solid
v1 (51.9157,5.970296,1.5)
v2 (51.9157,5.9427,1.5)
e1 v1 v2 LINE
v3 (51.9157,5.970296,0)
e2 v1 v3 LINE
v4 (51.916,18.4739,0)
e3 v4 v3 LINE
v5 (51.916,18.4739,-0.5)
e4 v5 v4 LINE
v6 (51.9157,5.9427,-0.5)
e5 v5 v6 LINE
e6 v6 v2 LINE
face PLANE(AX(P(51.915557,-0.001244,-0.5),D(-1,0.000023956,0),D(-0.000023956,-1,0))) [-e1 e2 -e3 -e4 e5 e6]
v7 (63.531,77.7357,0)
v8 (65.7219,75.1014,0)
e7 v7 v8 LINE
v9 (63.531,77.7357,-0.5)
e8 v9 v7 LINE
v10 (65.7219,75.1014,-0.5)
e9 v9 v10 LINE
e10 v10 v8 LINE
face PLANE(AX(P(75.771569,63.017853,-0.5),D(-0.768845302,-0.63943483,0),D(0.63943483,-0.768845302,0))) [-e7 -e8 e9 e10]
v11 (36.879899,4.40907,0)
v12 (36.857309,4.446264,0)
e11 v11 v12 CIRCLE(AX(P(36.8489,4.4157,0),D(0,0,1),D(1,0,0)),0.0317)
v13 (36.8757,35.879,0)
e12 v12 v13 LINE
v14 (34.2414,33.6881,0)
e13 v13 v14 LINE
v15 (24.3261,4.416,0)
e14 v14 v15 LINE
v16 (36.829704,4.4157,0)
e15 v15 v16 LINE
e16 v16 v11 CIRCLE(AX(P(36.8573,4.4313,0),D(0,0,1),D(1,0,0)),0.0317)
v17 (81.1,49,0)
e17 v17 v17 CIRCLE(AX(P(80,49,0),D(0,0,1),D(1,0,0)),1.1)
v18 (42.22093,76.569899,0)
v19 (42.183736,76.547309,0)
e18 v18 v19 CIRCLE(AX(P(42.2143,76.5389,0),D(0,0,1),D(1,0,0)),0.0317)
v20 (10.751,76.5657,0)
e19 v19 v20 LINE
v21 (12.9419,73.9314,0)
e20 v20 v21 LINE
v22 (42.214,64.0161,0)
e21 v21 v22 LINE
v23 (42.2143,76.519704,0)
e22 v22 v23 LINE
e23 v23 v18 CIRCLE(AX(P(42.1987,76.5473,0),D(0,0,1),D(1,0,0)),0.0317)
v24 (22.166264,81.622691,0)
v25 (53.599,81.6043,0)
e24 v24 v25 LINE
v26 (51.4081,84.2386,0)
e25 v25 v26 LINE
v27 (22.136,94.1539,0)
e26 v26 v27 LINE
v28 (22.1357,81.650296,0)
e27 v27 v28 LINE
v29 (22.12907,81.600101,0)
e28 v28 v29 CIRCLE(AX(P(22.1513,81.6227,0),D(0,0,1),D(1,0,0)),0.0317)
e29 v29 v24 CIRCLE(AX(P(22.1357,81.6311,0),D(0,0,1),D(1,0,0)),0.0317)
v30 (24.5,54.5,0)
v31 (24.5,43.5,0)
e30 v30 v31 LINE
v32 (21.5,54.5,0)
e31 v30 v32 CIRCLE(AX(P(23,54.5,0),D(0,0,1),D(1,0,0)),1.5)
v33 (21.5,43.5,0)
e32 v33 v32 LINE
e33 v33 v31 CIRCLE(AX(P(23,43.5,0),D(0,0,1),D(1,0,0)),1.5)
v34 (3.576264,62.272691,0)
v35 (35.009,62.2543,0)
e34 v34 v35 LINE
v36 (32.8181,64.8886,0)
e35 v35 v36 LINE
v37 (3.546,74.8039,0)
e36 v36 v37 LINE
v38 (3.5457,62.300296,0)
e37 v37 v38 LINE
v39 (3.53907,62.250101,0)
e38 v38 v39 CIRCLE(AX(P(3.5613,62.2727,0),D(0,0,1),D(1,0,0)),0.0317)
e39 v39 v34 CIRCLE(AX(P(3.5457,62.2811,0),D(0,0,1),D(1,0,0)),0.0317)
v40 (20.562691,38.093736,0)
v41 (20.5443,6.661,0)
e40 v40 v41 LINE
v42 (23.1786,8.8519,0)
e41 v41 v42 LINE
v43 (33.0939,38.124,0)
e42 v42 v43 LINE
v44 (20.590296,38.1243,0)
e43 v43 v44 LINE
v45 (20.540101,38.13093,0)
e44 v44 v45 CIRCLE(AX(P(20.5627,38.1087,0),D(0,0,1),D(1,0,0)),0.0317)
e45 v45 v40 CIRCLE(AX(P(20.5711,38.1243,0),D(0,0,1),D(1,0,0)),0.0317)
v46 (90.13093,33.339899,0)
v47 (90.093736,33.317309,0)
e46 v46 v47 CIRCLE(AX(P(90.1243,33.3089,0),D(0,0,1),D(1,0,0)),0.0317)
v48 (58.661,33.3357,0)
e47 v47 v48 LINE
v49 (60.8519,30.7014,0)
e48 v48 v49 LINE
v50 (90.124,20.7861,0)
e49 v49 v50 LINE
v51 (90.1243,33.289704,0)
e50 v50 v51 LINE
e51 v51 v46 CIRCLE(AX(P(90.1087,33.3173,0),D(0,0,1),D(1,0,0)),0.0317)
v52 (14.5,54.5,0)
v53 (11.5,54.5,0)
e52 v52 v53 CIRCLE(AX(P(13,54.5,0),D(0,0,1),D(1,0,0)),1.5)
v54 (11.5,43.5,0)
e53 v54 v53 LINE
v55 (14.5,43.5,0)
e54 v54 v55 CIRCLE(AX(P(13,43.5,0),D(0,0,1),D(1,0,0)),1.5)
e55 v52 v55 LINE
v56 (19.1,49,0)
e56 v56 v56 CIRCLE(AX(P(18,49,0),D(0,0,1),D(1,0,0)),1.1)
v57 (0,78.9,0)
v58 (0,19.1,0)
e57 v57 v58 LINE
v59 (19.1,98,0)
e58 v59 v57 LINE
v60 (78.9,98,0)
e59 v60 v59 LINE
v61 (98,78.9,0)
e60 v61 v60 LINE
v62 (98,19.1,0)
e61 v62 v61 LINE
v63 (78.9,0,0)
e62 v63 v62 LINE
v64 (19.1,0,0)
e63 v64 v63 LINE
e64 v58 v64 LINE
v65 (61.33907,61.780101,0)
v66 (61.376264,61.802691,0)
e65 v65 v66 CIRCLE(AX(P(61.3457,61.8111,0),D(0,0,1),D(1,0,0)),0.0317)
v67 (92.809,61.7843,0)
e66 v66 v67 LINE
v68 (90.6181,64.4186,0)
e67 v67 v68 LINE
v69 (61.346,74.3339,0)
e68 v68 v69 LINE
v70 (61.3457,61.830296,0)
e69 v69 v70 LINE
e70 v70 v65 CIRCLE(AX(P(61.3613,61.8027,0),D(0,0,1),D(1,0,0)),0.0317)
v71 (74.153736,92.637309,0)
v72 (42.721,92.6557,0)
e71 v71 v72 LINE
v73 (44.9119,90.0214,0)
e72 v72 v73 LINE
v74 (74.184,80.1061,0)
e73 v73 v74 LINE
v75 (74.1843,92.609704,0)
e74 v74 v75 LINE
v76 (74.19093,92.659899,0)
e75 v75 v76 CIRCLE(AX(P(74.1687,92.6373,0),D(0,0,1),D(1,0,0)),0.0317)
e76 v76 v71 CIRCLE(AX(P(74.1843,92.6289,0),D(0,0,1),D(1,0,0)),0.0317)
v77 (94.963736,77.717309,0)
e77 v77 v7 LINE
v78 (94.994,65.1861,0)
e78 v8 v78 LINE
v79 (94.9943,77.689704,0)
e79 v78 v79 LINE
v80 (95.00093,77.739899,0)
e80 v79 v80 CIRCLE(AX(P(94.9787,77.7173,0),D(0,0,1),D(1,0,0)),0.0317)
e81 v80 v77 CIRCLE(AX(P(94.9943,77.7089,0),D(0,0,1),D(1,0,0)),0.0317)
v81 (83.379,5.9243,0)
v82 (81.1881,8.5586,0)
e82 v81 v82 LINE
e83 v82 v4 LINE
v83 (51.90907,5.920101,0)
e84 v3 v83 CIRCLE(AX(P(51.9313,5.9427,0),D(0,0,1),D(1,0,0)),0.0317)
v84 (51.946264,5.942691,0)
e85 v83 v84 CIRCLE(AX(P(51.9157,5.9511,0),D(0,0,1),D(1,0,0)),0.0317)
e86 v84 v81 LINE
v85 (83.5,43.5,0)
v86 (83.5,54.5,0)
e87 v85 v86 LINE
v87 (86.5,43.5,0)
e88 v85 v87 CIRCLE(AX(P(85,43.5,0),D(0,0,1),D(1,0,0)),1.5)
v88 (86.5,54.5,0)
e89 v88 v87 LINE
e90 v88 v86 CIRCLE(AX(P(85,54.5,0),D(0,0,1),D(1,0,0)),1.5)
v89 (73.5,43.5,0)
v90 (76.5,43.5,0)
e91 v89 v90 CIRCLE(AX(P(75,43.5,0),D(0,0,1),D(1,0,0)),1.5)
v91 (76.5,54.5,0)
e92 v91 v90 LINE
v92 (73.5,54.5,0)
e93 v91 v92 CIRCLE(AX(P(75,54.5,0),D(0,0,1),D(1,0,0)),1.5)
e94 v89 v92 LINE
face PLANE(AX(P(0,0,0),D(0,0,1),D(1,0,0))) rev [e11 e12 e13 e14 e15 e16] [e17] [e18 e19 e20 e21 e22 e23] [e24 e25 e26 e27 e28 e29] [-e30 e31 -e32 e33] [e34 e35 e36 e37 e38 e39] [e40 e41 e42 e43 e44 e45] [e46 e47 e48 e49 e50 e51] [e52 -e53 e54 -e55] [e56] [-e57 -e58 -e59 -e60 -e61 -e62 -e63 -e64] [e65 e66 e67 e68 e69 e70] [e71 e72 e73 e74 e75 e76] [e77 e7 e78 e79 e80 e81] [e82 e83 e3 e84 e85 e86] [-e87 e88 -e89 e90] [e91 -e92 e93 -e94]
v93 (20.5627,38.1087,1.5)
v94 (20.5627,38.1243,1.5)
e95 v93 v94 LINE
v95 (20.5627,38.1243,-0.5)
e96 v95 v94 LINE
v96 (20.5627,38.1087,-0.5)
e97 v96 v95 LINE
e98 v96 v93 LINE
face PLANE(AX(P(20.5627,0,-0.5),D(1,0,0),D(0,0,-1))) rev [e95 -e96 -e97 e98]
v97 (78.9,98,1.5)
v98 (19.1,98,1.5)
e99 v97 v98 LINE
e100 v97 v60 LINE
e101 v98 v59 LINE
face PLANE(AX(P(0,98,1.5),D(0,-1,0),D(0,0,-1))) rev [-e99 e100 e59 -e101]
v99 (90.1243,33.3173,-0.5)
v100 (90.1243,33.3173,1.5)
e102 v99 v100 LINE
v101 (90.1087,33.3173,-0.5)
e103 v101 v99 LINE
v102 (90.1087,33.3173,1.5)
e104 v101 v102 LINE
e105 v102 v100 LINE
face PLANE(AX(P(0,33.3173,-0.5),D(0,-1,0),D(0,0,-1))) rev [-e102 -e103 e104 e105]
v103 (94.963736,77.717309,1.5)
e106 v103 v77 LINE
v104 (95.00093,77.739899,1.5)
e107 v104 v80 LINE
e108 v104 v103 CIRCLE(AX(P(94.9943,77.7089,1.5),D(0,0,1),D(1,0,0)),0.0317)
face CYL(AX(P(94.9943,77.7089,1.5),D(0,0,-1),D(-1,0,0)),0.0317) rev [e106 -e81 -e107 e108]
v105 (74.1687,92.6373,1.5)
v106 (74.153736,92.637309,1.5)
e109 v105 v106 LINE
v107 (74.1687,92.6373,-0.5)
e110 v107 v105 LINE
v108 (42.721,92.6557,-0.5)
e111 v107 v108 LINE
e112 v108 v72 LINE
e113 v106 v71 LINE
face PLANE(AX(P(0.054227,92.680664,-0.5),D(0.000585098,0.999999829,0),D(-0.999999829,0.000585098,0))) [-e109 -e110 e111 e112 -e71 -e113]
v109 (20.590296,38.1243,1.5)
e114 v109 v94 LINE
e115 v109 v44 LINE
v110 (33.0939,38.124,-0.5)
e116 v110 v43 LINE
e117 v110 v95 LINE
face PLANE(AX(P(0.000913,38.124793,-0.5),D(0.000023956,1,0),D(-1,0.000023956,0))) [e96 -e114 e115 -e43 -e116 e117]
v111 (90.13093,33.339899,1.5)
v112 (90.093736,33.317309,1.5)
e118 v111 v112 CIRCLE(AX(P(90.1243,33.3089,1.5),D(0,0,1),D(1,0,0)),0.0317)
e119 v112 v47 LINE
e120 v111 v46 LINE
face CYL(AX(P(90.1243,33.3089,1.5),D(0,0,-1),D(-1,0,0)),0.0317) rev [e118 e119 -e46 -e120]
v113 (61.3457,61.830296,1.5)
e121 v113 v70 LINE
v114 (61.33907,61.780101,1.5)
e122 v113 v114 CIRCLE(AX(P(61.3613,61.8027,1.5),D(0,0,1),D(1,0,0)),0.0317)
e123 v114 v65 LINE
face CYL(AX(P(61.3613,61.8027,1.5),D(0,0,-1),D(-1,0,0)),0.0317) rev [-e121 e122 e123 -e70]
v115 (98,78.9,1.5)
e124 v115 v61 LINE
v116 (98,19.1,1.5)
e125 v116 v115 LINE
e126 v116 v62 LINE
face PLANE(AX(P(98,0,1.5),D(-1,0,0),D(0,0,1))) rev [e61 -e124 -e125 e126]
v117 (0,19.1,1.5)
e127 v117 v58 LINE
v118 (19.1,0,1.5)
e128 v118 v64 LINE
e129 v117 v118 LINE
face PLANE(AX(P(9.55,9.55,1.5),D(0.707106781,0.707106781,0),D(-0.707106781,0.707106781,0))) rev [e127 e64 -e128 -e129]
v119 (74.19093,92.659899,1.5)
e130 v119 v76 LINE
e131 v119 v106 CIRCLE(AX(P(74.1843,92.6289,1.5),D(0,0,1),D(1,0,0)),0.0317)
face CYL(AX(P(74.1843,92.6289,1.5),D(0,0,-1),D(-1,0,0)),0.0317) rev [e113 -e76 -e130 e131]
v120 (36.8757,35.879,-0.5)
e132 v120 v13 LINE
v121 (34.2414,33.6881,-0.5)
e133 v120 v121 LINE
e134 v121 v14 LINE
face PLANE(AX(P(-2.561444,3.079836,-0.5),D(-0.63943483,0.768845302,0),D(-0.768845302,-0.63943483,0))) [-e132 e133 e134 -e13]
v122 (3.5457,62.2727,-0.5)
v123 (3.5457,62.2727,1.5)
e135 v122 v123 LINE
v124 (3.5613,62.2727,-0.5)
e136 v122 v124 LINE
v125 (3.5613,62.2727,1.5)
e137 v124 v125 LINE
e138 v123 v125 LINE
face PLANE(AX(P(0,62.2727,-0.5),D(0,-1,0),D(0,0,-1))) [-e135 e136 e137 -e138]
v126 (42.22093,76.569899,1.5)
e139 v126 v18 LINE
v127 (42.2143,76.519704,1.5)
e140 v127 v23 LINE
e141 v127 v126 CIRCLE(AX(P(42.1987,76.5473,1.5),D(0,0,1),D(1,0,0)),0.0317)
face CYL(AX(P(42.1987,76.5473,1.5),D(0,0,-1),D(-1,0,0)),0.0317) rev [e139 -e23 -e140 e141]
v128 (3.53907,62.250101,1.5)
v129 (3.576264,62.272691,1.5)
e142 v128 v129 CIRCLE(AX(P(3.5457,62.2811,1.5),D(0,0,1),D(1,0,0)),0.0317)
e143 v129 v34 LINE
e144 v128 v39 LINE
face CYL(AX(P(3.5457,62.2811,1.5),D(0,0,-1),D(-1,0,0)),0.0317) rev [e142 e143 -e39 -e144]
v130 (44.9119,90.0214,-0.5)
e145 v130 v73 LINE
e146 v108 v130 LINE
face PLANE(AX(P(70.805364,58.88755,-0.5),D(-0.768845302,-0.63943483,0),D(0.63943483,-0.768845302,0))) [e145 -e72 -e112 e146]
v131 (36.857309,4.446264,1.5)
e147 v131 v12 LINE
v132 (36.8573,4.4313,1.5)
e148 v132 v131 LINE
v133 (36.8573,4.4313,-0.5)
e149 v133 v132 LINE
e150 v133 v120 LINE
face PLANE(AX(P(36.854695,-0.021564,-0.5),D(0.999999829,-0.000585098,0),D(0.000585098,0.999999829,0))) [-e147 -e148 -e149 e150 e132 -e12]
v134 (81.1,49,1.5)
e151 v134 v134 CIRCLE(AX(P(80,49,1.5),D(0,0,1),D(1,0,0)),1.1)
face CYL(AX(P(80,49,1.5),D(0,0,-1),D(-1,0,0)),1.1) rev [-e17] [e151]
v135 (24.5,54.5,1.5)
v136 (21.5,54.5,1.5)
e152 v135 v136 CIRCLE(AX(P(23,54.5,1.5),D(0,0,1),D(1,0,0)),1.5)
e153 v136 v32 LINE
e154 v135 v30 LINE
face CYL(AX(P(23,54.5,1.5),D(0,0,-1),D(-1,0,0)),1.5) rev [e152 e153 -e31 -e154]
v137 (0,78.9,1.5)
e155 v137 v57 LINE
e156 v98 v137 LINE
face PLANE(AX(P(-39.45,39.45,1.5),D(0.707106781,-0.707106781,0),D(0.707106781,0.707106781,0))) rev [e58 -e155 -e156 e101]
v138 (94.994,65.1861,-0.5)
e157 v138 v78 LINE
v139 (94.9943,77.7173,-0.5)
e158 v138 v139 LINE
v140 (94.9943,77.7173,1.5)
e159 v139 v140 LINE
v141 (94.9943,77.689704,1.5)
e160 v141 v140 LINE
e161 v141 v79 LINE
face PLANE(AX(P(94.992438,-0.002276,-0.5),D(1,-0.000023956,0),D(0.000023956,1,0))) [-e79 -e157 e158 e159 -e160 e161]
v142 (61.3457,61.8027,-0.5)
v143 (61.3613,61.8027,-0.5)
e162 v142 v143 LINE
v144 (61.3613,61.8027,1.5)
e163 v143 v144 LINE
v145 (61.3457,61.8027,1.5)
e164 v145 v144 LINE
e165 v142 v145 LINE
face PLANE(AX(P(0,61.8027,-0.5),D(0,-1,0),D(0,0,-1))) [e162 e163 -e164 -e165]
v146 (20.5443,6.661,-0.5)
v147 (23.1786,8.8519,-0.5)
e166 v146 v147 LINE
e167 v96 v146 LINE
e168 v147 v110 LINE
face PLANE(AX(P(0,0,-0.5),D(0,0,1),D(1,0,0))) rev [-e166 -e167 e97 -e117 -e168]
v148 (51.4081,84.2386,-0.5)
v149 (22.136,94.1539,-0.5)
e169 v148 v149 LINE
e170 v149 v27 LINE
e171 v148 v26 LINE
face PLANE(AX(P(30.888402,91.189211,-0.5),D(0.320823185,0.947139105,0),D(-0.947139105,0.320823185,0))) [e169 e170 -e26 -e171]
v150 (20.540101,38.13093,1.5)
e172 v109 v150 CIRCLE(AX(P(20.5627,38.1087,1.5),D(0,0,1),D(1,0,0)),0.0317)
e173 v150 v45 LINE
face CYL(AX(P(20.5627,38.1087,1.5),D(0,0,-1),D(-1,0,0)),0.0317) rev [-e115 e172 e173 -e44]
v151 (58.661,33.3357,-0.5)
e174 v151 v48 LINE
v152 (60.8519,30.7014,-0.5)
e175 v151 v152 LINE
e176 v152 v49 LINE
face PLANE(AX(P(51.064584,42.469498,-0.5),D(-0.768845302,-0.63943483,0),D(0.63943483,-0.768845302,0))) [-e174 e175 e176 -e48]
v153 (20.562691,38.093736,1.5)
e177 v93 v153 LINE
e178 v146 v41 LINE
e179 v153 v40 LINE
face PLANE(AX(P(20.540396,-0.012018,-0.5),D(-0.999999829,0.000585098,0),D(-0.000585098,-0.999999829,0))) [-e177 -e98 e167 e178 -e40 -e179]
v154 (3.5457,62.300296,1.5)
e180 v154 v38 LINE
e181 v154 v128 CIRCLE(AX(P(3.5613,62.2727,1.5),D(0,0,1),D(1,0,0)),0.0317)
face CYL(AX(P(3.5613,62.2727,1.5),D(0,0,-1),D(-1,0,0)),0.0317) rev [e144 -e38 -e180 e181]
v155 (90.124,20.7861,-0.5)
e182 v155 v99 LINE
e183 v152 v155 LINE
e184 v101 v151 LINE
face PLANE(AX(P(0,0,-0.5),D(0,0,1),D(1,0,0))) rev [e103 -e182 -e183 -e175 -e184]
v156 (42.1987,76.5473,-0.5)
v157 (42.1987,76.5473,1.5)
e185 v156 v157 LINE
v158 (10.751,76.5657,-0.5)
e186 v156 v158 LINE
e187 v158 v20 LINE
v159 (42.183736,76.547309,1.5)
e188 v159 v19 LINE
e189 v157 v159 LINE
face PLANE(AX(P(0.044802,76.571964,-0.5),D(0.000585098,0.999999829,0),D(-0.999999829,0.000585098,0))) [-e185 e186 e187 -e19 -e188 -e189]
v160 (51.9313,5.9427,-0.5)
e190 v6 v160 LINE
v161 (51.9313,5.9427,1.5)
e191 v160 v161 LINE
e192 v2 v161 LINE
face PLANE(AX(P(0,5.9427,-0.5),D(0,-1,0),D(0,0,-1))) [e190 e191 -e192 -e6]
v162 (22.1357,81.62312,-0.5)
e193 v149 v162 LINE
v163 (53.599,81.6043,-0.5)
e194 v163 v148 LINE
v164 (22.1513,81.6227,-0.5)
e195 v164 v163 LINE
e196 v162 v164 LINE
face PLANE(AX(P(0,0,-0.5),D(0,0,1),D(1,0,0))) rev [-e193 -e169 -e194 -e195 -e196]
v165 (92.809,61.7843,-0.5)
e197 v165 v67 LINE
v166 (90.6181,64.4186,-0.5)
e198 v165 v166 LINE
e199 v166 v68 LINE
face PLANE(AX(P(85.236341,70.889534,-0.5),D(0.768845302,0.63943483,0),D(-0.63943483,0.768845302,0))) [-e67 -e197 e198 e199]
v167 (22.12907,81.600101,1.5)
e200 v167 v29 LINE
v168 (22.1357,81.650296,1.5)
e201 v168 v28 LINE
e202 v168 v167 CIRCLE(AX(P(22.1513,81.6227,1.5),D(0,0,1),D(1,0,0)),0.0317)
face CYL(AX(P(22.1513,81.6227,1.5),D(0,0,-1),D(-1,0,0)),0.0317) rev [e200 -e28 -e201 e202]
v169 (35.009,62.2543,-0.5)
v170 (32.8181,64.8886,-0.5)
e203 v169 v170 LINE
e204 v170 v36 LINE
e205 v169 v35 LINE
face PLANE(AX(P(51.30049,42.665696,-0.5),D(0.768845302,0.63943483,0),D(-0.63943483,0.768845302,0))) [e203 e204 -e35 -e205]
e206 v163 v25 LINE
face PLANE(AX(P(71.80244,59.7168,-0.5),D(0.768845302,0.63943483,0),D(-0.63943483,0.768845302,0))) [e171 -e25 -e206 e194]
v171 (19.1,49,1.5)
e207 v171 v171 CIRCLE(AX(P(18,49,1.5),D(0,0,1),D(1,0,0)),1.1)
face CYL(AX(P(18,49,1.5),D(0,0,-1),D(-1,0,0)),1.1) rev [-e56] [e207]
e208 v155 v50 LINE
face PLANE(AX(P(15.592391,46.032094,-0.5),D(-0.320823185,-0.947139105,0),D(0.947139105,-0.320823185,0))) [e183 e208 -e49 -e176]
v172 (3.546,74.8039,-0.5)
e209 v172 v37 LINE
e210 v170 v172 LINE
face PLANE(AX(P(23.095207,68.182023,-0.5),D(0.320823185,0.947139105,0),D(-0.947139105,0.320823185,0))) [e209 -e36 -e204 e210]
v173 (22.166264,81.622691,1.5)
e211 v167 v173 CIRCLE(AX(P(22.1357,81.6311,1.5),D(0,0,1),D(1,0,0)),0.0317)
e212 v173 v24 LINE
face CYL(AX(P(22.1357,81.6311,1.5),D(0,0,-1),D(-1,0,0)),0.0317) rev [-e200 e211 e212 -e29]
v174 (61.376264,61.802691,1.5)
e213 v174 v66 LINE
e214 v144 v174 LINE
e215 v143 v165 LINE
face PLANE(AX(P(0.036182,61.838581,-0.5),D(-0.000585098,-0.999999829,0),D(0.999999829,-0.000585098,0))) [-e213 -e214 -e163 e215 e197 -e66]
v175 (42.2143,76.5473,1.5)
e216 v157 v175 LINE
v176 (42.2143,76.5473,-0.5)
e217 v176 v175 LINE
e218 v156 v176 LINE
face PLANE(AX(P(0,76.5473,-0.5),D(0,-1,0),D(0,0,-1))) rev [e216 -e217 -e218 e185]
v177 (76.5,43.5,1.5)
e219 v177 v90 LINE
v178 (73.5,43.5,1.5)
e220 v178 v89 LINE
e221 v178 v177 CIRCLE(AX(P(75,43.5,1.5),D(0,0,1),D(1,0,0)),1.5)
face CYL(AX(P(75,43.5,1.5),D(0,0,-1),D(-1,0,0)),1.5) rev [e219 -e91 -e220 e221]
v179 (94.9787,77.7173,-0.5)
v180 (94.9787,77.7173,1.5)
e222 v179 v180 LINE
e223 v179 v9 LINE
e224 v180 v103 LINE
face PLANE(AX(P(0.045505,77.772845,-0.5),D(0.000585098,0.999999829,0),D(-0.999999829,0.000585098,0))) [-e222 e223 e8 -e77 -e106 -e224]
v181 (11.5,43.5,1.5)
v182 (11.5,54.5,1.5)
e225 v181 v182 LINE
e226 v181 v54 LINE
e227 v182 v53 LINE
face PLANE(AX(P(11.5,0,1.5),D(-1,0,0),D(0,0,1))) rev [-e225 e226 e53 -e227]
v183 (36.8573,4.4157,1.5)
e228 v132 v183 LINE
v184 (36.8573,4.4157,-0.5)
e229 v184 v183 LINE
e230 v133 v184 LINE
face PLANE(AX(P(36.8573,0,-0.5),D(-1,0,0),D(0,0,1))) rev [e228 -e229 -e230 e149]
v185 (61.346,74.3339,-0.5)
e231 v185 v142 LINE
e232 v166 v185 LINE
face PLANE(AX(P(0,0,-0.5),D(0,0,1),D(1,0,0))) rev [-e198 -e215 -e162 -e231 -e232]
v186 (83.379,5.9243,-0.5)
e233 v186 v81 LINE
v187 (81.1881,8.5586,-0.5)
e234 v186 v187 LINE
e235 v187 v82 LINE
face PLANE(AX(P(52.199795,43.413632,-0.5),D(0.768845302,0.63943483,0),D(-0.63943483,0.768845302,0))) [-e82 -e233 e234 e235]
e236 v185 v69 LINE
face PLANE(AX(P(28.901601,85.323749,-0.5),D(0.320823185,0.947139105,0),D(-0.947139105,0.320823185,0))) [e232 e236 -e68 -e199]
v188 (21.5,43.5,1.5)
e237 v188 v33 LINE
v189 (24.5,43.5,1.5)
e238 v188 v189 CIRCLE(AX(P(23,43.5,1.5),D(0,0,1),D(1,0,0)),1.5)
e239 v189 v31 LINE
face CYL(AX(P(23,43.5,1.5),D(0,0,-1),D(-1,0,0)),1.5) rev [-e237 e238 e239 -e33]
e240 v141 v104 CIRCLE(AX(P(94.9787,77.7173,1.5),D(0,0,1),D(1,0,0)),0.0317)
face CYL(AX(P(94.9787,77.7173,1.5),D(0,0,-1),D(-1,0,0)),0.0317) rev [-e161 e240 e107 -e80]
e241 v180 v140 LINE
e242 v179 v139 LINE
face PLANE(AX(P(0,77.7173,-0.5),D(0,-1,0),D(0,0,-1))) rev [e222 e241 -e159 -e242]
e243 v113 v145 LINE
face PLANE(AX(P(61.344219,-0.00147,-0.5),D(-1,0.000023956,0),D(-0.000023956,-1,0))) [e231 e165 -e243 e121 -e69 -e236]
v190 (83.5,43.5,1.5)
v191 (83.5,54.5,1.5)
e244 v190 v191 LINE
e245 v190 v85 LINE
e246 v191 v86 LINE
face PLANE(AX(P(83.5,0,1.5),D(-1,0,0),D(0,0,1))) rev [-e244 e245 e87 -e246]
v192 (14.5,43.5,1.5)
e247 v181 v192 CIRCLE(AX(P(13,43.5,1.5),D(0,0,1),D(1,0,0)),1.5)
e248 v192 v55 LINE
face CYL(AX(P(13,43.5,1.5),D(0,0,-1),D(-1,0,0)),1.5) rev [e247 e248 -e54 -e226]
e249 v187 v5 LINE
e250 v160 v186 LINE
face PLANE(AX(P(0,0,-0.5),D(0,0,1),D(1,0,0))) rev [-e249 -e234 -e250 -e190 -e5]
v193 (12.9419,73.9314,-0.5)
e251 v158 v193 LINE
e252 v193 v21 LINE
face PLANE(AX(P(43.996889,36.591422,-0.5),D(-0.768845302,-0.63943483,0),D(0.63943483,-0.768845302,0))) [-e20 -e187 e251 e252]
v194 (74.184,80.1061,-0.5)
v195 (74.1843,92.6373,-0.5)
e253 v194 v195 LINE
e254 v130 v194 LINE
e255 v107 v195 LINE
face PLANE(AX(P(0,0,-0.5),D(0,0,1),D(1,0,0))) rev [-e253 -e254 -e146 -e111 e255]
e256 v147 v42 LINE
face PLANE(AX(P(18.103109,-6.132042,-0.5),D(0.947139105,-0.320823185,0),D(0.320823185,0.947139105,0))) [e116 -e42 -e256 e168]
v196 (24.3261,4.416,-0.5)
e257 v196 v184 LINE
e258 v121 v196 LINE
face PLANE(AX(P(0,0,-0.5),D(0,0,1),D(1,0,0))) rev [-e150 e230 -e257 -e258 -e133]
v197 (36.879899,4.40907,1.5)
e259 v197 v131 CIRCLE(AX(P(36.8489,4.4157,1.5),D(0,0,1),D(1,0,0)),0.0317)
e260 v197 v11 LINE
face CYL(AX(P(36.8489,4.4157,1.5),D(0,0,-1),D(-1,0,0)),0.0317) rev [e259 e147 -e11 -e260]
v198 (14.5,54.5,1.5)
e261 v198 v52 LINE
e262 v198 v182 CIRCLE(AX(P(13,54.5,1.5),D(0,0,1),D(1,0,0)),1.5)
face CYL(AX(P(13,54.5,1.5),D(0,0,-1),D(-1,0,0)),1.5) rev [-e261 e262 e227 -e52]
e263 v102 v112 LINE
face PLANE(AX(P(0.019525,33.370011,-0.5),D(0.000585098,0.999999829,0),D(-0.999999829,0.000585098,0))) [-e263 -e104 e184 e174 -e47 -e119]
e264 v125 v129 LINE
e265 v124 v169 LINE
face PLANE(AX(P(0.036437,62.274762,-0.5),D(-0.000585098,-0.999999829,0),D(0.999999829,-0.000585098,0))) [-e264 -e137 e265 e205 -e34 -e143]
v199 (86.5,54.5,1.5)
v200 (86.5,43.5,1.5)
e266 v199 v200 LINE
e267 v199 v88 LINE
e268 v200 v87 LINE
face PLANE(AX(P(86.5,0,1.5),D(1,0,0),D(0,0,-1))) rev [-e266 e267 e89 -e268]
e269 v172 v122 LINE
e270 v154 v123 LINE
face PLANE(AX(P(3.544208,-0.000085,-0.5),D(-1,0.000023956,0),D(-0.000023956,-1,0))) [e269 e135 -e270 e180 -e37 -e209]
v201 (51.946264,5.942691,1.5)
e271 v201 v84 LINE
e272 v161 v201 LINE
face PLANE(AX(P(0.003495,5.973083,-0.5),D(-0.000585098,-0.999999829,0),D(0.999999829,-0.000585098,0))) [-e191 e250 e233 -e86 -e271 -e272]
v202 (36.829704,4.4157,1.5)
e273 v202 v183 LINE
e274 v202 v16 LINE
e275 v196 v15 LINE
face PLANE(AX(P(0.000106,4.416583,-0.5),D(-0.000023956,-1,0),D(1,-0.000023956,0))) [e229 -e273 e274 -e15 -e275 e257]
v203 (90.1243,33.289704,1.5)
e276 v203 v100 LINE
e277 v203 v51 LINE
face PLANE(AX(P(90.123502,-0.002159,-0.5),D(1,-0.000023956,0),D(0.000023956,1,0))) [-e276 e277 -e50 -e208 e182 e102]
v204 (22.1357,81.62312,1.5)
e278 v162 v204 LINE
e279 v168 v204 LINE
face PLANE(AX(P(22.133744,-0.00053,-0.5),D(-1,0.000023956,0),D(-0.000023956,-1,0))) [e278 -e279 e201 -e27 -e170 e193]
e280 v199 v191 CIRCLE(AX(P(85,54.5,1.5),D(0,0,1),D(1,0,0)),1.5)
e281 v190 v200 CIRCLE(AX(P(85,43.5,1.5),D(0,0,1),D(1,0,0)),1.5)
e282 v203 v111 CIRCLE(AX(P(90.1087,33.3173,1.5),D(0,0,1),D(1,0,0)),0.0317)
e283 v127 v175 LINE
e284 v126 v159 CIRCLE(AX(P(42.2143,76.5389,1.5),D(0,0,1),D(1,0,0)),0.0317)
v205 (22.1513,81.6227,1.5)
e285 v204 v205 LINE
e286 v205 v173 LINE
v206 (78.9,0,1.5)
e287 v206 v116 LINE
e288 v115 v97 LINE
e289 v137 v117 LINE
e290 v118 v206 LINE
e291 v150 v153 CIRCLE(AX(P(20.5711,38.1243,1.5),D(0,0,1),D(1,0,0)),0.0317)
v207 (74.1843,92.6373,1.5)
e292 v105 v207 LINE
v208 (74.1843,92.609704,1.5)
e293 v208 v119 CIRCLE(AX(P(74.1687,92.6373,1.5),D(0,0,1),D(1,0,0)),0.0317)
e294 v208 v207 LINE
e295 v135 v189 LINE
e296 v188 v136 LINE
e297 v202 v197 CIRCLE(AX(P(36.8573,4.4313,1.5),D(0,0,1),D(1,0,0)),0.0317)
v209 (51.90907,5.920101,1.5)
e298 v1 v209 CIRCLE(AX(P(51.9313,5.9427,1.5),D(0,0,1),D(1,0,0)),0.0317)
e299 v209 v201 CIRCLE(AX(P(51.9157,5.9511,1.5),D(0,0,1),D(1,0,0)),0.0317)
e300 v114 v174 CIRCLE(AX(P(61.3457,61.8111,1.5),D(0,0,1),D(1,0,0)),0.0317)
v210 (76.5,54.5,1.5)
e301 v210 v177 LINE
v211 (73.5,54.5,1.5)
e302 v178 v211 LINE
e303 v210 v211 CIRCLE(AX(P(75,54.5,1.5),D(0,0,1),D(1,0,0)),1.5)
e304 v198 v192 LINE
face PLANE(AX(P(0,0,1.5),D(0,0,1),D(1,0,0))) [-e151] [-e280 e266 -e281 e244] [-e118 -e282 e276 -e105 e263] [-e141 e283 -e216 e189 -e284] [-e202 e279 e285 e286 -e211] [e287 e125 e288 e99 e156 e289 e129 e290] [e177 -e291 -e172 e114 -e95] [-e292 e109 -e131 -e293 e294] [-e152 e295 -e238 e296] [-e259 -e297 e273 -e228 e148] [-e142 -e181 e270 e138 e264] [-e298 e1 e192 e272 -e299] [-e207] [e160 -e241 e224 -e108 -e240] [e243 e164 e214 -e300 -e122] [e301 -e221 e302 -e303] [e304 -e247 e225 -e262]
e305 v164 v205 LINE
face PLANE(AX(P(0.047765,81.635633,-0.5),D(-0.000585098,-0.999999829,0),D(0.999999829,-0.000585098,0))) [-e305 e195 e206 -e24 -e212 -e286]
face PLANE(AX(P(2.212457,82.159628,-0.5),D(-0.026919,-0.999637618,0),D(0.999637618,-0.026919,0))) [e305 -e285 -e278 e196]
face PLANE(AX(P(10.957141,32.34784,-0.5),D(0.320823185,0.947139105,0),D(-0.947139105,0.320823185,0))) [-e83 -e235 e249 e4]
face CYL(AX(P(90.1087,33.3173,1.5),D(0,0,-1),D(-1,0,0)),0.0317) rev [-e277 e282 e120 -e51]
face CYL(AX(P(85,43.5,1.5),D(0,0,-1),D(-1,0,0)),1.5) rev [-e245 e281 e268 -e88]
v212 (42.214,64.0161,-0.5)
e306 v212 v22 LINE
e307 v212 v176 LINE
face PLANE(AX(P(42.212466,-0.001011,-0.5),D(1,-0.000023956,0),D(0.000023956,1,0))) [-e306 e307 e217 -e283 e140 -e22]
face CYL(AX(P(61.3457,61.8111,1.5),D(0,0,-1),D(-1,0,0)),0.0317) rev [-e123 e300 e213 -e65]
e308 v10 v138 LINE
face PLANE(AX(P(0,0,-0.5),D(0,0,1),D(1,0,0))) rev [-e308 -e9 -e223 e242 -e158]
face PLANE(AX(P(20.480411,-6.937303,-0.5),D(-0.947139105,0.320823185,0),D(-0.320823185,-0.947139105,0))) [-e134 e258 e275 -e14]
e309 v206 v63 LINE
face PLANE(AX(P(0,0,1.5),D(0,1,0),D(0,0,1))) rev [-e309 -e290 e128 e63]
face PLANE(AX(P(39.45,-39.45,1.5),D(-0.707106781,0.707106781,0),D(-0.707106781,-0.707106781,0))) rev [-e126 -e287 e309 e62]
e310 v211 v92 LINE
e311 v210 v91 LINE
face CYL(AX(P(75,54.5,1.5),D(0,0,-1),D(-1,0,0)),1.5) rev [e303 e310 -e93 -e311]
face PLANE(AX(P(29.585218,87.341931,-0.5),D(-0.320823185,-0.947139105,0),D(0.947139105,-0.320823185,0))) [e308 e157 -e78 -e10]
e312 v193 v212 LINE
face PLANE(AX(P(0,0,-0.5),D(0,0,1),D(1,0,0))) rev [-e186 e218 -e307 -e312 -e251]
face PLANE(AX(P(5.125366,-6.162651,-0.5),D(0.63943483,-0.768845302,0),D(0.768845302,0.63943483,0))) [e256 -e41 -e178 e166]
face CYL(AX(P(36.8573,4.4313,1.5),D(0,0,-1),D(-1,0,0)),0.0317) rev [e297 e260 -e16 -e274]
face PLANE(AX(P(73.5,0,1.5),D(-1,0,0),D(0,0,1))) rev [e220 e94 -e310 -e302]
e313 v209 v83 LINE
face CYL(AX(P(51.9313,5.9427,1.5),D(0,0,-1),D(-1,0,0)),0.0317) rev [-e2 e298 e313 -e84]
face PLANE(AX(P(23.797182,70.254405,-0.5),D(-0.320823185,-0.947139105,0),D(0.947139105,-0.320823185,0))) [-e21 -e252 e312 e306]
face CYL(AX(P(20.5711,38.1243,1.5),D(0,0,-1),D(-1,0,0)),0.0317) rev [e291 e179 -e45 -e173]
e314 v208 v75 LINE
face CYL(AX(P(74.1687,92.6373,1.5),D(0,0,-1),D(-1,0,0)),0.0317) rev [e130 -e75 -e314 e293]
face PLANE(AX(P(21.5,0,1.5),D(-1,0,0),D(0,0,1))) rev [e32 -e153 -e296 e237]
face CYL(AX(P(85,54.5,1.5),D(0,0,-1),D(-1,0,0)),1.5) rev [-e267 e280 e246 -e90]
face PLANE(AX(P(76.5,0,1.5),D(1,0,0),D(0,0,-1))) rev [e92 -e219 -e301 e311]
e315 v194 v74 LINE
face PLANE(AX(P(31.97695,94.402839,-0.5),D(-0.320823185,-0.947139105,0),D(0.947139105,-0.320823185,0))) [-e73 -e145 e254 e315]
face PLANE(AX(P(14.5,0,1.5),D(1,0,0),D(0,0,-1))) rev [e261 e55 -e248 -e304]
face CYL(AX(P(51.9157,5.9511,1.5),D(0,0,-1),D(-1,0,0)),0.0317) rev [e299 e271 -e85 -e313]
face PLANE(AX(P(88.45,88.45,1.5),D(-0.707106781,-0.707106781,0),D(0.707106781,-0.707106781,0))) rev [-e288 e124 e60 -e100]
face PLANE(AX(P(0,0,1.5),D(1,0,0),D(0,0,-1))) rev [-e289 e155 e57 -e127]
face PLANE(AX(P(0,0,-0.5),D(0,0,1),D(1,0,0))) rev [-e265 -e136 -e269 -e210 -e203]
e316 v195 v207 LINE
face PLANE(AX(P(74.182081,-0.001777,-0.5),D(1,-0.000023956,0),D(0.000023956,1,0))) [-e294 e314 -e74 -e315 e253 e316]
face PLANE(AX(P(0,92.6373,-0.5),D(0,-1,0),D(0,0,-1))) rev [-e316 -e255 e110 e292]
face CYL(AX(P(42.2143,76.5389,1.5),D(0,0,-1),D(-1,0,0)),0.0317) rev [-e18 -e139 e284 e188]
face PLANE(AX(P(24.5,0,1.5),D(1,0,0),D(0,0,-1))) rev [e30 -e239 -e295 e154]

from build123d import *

# Parameters (mm, degrees)
BOSS_EXTRUDE1_OUTLINE_R  = 1.1
BOSS_EXTRUDE1_DEPTH      = 1.5
BOSS_EXTRUDE2_DEPTH      = 1.5
BOSS_EXTRUDE2_DEPTH_BACK = 0.5


# Read off the part's stored shape, not the designer's step: Boss-Extrude1
with BuildPart() as part:
    # Boss-Extrude1 outline → Boss-Extrude1 (new body)
    with BuildSketch(Plane.XY):
        Polygon((19.1, 98), (0, 78.9), (0, 19.1), (19.1, 0), (78.9, 0), (98, 19.1), (98, 78.9), (78.9, 98), align=None)
        with BuildLine():
            Line((36.8757, 35.879), (36.857308756, 4.446264405))
            ThreePointArc((36.857308756, 4.446264405), (36.875994273, 4.43215571), (36.879898885, 4.409069831))
            ThreePointArc((36.879898885, 4.409069831), (36.853148575, 4.399873011), (36.829703907, 4.41570046))
            Line((36.829703907, 4.41570046), (24.3261, 4.416))
            Line((24.3261, 4.416), (34.2414, 33.6881))
            Line((34.2414, 33.6881), (36.8757, 35.879))
        make_face(mode=Mode.SUBTRACT)
        with BuildLine():
            Line((20.5443, 6.661), (20.562691244, 38.093735595))
            ThreePointArc((20.562691244, 38.093735595), (20.544005727, 38.10784429), (20.540101115, 38.130930169))
            ThreePointArc((20.540101115, 38.130930169), (20.566851425, 38.140126989), (20.590296093, 38.12429954))
            Line((20.590296093, 38.12429954), (33.0939, 38.124))
            Line((33.0939, 38.124), (23.1786, 8.8519))
            Line((23.1786, 8.8519), (20.5443, 6.661))
        make_face(mode=Mode.SUBTRACT)
        with BuildLine():
            Line((11.5, 43.5), (11.5, 54.5))
            ThreePointArc((11.5, 54.5), (13, 56), (14.5, 54.5))
            Line((14.5, 54.5), (14.5, 43.5))
            ThreePointArc((14.5, 43.5), (13, 42), (11.5, 43.5))
        make_face(mode=Mode.SUBTRACT)
        with Locations((18, 49)):
            Circle(BOSS_EXTRUDE1_OUTLINE_R, mode=Mode.SUBTRACT)
        with BuildLine():
            Line((21.5, 43.5), (21.5, 54.5))
            ThreePointArc((21.5, 54.5), (23, 56), (24.5, 54.5))
            Line((24.5, 54.5), (24.5, 43.5))
            ThreePointArc((24.5, 43.5), (23, 42), (21.5, 43.5))
        make_face(mode=Mode.SUBTRACT)
        with BuildLine():
            Line((83.379, 5.9243), (51.946264405, 5.942691244))
            ThreePointArc((51.946264405, 5.942691244), (51.93215571, 5.924005727), (51.909069831, 5.920101115))
            ThreePointArc((51.909069831, 5.920101115), (51.899873011, 5.946851425), (51.91570046, 5.970296093))
            Line((51.91570046, 5.970296093), (51.916, 18.4739))
            Line((51.916, 18.4739), (81.1881, 8.5586))
            Line((81.1881, 8.5586), (83.379, 5.9243))
        make_face(mode=Mode.SUBTRACT)
        with BuildLine():
            Line((58.661, 33.3357), (90.093735595, 33.317308756))
            ThreePointArc((90.093735595, 33.317308756), (90.10784429, 33.335994273), (90.130930169, 33.339898885))
            ThreePointArc((90.130930169, 33.339898885), (90.140126989, 33.313148575), (90.12429954, 33.289703907))
            Line((90.12429954, 33.289703907), (90.124, 20.7861))
            Line((90.124, 20.7861), (60.8519, 30.7014))
            Line((60.8519, 30.7014), (58.661, 33.3357))
        make_face(mode=Mode.SUBTRACT)
        with BuildLine():
            Line((73.5, 43.5), (73.5, 54.5))
            ThreePointArc((73.5, 54.5), (75, 56), (76.5, 54.5))
            Line((76.5, 54.5), (76.5, 43.5))
            ThreePointArc((76.5, 43.5), (75, 42), (73.5, 43.5))
        make_face(mode=Mode.SUBTRACT)
        with Locations((80, 49)):
            Circle(BOSS_EXTRUDE1_OUTLINE_R, mode=Mode.SUBTRACT)
        with BuildLine():
            Line((83.5, 43.5), (83.5, 54.5))
            ThreePointArc((83.5, 54.5), (85, 56), (86.5, 54.5))
            Line((86.5, 54.5), (86.5, 43.5))
            ThreePointArc((86.5, 43.5), (85, 42), (83.5, 43.5))
        make_face(mode=Mode.SUBTRACT)
        with BuildLine():
            Line((35.009, 62.2543), (3.576264405, 62.272691244))
            ThreePointArc((3.576264405, 62.272691244), (3.56215571, 62.254005727), (3.539069831, 62.250101115))
            ThreePointArc((3.539069831, 62.250101115), (3.529873011, 62.276851425), (3.54570046, 62.300296093))
            Line((3.54570046, 62.300296093), (3.546, 74.8039))
            Line((3.546, 74.8039), (32.8181, 64.8886))
            Line((32.8181, 64.8886), (35.009, 62.2543))
        make_face(mode=Mode.SUBTRACT)
        with BuildLine():
            Line((10.751, 76.5657), (42.183735595, 76.547308756))
            ThreePointArc((42.183735595, 76.547308756), (42.19784429, 76.565994273), (42.220930169, 76.569898885))
            ThreePointArc((42.220930169, 76.569898885), (42.230126989, 76.543148575), (42.21429954, 76.519703907))
            Line((42.21429954, 76.519703907), (42.214, 64.0161))
            Line((42.214, 64.0161), (12.9419, 73.9314))
            Line((12.9419, 73.9314), (10.751, 76.5657))
        make_face(mode=Mode.SUBTRACT)
        with BuildLine():
            Line((53.599, 81.6043), (22.166264405, 81.622691244))
            ThreePointArc((22.166264405, 81.622691244), (22.15215571, 81.604005727), (22.129069831, 81.600101115))
            ThreePointArc((22.129069831, 81.600101115), (22.119873011, 81.626851425), (22.13570046, 81.650296093))
            Line((22.13570046, 81.650296093), (22.136, 94.1539))
            Line((22.136, 94.1539), (51.4081, 84.2386))
            Line((51.4081, 84.2386), (53.599, 81.6043))
        make_face(mode=Mode.SUBTRACT)
        with BuildLine():
            Line((92.809, 61.7843), (61.376264405, 61.802691244))
            ThreePointArc((61.376264405, 61.802691244), (61.36215571, 61.784005727), (61.339069831, 61.780101115))
            ThreePointArc((61.339069831, 61.780101115), (61.329873011, 61.806851425), (61.34570046, 61.830296093))
            Line((61.34570046, 61.830296093), (61.346, 74.3339))
            Line((61.346, 74.3339), (90.6181, 64.4186))
            Line((90.6181, 64.4186), (92.809, 61.7843))
        make_face(mode=Mode.SUBTRACT)
        with BuildLine():
            Line((63.531, 77.7357), (94.963735595, 77.717308756))
            ThreePointArc((94.963735595, 77.717308756), (94.97784429, 77.735994273), (95.000930169, 77.739898885))
            ThreePointArc((95.000930169, 77.739898885), (95.010126989, 77.713148575), (94.99429954, 77.689703907))
            Line((94.99429954, 77.689703907), (94.994, 65.1861))
            Line((94.994, 65.1861), (65.7219, 75.1014))
            Line((65.7219, 75.1014), (63.531, 77.7357))
        make_face(mode=Mode.SUBTRACT)
        with BuildLine():
            Line((42.721, 92.6557), (74.153735595, 92.637308756))
            ThreePointArc((74.153735595, 92.637308756), (74.16784429, 92.655994273), (74.190930169, 92.659898885))
            ThreePointArc((74.190930169, 92.659898885), (74.200126989, 92.633148575), (74.18429954, 92.609703907))
            Line((74.18429954, 92.609703907), (74.184, 80.1061))
            Line((74.184, 80.1061), (44.9119, 90.0214))
            Line((44.9119, 90.0214), (42.721, 92.6557))
        make_face(mode=Mode.SUBTRACT)
    extrude(amount=BOSS_EXTRUDE1_DEPTH)

    # Model<4> → Boss-Extrude2 (add, two sides: drawn at the far end of the back side and taken through both)
    with BuildSketch(Plane.XY.offset(-BOSS_EXTRUDE2_DEPTH_BACK)):
        Polygon((42.2143, 76.5473), (42.1987, 76.5473), (42.183735595, 76.547308756), (10.751, 76.5657), (12.92157794, 73.955834891), (12.9419, 73.9314), (12.971962529, 73.921216959), (42.214, 64.0161), (42.21429954, 76.519703907), (42.2143, 76.5389), align=None)
        Polygon((3.54570046, 62.300296093), (3.5457, 62.2811), (3.5457, 62.2727), (3.5613, 62.2727), (3.576264405, 62.272691244), (35.009, 62.2543), (32.83842206, 64.864165109), (32.8181, 64.8886), (32.788037471, 64.898783041), (3.546, 74.8039), align=None)
        Polygon((22.13570046, 81.650296093), (22.1357, 81.6311), (22.1357, 81.623120089), (22.1513, 81.6227), (22.166264405, 81.622691244), (53.599, 81.6043), (51.42842206, 84.214165109), (51.4081, 84.2386), (51.378037471, 84.248783041), (22.136, 94.1539), align=None)
        Polygon((74.1843, 92.6373), (74.1687, 92.6373), (74.153735595, 92.637308756), (42.721, 92.6557), (44.89157794, 90.045834891), (44.9119, 90.0214), (44.941962529, 90.011216959), (74.184, 80.1061), (74.18429954, 92.609703907), (74.1843, 92.6289), align=None)
        Polygon((94.9943, 77.7173), (94.9787, 77.7173), (94.963735595, 77.717308756), (63.531, 77.7357), (65.70157794, 75.125834891), (65.7219, 75.1014), (65.751962529, 75.091216959), (94.994, 65.1861), (94.99429954, 77.689703907), (94.9943, 77.7089), align=None)
        Polygon((61.34570046, 61.830296093), (61.3457, 61.8111), (61.3457, 61.8027), (61.3613, 61.8027), (61.376264405, 61.802691244), (92.809, 61.7843), (90.63842206, 64.394165109), (90.6181, 64.4186), (90.588037471, 64.428783041), (61.346, 74.3339), align=None)
        Polygon((20.5627, 38.1243), (20.5627, 38.1087), (20.562691244, 38.093735595), (20.5443, 6.661), (23.154165109, 8.83157794), (23.1786, 8.8519), (23.188783041, 8.881962529), (33.0939, 38.124), (20.590296093, 38.12429954), (20.5711, 38.1243), align=None)
        Polygon((36.8573, 4.4157), (36.8573, 4.4313), (36.857308756, 4.446264405), (36.8757, 35.879), (34.265834891, 33.70842206), (34.2414, 33.6881), (34.231216959, 33.658037471), (24.3261, 4.416), (36.829703907, 4.41570046), (36.8489, 4.4157), align=None)
        Polygon((51.91570046, 5.970296093), (51.9157, 5.9511), (51.9157, 5.9427), (51.9313, 5.9427), (51.946264405, 5.942691244), (83.379, 5.9243), (81.20842206, 8.534165109), (81.1881, 8.5586), (81.158037471, 8.568783041), (51.916, 18.4739), align=None)
        Polygon((90.1243, 33.3173), (90.1087, 33.3173), (90.093735595, 33.317308756), (58.661, 33.3357), (60.83157794, 30.725834891), (60.8519, 30.7014), (60.881962529, 30.691216959), (90.124, 20.7861), (90.12429954, 33.289703907), (90.1243, 33.3089), align=None)
    extrude(amount=BOSS_EXTRUDE2_DEPTH + BOSS_EXTRUDE2_DEPTH_BACK)


solid = part.part
